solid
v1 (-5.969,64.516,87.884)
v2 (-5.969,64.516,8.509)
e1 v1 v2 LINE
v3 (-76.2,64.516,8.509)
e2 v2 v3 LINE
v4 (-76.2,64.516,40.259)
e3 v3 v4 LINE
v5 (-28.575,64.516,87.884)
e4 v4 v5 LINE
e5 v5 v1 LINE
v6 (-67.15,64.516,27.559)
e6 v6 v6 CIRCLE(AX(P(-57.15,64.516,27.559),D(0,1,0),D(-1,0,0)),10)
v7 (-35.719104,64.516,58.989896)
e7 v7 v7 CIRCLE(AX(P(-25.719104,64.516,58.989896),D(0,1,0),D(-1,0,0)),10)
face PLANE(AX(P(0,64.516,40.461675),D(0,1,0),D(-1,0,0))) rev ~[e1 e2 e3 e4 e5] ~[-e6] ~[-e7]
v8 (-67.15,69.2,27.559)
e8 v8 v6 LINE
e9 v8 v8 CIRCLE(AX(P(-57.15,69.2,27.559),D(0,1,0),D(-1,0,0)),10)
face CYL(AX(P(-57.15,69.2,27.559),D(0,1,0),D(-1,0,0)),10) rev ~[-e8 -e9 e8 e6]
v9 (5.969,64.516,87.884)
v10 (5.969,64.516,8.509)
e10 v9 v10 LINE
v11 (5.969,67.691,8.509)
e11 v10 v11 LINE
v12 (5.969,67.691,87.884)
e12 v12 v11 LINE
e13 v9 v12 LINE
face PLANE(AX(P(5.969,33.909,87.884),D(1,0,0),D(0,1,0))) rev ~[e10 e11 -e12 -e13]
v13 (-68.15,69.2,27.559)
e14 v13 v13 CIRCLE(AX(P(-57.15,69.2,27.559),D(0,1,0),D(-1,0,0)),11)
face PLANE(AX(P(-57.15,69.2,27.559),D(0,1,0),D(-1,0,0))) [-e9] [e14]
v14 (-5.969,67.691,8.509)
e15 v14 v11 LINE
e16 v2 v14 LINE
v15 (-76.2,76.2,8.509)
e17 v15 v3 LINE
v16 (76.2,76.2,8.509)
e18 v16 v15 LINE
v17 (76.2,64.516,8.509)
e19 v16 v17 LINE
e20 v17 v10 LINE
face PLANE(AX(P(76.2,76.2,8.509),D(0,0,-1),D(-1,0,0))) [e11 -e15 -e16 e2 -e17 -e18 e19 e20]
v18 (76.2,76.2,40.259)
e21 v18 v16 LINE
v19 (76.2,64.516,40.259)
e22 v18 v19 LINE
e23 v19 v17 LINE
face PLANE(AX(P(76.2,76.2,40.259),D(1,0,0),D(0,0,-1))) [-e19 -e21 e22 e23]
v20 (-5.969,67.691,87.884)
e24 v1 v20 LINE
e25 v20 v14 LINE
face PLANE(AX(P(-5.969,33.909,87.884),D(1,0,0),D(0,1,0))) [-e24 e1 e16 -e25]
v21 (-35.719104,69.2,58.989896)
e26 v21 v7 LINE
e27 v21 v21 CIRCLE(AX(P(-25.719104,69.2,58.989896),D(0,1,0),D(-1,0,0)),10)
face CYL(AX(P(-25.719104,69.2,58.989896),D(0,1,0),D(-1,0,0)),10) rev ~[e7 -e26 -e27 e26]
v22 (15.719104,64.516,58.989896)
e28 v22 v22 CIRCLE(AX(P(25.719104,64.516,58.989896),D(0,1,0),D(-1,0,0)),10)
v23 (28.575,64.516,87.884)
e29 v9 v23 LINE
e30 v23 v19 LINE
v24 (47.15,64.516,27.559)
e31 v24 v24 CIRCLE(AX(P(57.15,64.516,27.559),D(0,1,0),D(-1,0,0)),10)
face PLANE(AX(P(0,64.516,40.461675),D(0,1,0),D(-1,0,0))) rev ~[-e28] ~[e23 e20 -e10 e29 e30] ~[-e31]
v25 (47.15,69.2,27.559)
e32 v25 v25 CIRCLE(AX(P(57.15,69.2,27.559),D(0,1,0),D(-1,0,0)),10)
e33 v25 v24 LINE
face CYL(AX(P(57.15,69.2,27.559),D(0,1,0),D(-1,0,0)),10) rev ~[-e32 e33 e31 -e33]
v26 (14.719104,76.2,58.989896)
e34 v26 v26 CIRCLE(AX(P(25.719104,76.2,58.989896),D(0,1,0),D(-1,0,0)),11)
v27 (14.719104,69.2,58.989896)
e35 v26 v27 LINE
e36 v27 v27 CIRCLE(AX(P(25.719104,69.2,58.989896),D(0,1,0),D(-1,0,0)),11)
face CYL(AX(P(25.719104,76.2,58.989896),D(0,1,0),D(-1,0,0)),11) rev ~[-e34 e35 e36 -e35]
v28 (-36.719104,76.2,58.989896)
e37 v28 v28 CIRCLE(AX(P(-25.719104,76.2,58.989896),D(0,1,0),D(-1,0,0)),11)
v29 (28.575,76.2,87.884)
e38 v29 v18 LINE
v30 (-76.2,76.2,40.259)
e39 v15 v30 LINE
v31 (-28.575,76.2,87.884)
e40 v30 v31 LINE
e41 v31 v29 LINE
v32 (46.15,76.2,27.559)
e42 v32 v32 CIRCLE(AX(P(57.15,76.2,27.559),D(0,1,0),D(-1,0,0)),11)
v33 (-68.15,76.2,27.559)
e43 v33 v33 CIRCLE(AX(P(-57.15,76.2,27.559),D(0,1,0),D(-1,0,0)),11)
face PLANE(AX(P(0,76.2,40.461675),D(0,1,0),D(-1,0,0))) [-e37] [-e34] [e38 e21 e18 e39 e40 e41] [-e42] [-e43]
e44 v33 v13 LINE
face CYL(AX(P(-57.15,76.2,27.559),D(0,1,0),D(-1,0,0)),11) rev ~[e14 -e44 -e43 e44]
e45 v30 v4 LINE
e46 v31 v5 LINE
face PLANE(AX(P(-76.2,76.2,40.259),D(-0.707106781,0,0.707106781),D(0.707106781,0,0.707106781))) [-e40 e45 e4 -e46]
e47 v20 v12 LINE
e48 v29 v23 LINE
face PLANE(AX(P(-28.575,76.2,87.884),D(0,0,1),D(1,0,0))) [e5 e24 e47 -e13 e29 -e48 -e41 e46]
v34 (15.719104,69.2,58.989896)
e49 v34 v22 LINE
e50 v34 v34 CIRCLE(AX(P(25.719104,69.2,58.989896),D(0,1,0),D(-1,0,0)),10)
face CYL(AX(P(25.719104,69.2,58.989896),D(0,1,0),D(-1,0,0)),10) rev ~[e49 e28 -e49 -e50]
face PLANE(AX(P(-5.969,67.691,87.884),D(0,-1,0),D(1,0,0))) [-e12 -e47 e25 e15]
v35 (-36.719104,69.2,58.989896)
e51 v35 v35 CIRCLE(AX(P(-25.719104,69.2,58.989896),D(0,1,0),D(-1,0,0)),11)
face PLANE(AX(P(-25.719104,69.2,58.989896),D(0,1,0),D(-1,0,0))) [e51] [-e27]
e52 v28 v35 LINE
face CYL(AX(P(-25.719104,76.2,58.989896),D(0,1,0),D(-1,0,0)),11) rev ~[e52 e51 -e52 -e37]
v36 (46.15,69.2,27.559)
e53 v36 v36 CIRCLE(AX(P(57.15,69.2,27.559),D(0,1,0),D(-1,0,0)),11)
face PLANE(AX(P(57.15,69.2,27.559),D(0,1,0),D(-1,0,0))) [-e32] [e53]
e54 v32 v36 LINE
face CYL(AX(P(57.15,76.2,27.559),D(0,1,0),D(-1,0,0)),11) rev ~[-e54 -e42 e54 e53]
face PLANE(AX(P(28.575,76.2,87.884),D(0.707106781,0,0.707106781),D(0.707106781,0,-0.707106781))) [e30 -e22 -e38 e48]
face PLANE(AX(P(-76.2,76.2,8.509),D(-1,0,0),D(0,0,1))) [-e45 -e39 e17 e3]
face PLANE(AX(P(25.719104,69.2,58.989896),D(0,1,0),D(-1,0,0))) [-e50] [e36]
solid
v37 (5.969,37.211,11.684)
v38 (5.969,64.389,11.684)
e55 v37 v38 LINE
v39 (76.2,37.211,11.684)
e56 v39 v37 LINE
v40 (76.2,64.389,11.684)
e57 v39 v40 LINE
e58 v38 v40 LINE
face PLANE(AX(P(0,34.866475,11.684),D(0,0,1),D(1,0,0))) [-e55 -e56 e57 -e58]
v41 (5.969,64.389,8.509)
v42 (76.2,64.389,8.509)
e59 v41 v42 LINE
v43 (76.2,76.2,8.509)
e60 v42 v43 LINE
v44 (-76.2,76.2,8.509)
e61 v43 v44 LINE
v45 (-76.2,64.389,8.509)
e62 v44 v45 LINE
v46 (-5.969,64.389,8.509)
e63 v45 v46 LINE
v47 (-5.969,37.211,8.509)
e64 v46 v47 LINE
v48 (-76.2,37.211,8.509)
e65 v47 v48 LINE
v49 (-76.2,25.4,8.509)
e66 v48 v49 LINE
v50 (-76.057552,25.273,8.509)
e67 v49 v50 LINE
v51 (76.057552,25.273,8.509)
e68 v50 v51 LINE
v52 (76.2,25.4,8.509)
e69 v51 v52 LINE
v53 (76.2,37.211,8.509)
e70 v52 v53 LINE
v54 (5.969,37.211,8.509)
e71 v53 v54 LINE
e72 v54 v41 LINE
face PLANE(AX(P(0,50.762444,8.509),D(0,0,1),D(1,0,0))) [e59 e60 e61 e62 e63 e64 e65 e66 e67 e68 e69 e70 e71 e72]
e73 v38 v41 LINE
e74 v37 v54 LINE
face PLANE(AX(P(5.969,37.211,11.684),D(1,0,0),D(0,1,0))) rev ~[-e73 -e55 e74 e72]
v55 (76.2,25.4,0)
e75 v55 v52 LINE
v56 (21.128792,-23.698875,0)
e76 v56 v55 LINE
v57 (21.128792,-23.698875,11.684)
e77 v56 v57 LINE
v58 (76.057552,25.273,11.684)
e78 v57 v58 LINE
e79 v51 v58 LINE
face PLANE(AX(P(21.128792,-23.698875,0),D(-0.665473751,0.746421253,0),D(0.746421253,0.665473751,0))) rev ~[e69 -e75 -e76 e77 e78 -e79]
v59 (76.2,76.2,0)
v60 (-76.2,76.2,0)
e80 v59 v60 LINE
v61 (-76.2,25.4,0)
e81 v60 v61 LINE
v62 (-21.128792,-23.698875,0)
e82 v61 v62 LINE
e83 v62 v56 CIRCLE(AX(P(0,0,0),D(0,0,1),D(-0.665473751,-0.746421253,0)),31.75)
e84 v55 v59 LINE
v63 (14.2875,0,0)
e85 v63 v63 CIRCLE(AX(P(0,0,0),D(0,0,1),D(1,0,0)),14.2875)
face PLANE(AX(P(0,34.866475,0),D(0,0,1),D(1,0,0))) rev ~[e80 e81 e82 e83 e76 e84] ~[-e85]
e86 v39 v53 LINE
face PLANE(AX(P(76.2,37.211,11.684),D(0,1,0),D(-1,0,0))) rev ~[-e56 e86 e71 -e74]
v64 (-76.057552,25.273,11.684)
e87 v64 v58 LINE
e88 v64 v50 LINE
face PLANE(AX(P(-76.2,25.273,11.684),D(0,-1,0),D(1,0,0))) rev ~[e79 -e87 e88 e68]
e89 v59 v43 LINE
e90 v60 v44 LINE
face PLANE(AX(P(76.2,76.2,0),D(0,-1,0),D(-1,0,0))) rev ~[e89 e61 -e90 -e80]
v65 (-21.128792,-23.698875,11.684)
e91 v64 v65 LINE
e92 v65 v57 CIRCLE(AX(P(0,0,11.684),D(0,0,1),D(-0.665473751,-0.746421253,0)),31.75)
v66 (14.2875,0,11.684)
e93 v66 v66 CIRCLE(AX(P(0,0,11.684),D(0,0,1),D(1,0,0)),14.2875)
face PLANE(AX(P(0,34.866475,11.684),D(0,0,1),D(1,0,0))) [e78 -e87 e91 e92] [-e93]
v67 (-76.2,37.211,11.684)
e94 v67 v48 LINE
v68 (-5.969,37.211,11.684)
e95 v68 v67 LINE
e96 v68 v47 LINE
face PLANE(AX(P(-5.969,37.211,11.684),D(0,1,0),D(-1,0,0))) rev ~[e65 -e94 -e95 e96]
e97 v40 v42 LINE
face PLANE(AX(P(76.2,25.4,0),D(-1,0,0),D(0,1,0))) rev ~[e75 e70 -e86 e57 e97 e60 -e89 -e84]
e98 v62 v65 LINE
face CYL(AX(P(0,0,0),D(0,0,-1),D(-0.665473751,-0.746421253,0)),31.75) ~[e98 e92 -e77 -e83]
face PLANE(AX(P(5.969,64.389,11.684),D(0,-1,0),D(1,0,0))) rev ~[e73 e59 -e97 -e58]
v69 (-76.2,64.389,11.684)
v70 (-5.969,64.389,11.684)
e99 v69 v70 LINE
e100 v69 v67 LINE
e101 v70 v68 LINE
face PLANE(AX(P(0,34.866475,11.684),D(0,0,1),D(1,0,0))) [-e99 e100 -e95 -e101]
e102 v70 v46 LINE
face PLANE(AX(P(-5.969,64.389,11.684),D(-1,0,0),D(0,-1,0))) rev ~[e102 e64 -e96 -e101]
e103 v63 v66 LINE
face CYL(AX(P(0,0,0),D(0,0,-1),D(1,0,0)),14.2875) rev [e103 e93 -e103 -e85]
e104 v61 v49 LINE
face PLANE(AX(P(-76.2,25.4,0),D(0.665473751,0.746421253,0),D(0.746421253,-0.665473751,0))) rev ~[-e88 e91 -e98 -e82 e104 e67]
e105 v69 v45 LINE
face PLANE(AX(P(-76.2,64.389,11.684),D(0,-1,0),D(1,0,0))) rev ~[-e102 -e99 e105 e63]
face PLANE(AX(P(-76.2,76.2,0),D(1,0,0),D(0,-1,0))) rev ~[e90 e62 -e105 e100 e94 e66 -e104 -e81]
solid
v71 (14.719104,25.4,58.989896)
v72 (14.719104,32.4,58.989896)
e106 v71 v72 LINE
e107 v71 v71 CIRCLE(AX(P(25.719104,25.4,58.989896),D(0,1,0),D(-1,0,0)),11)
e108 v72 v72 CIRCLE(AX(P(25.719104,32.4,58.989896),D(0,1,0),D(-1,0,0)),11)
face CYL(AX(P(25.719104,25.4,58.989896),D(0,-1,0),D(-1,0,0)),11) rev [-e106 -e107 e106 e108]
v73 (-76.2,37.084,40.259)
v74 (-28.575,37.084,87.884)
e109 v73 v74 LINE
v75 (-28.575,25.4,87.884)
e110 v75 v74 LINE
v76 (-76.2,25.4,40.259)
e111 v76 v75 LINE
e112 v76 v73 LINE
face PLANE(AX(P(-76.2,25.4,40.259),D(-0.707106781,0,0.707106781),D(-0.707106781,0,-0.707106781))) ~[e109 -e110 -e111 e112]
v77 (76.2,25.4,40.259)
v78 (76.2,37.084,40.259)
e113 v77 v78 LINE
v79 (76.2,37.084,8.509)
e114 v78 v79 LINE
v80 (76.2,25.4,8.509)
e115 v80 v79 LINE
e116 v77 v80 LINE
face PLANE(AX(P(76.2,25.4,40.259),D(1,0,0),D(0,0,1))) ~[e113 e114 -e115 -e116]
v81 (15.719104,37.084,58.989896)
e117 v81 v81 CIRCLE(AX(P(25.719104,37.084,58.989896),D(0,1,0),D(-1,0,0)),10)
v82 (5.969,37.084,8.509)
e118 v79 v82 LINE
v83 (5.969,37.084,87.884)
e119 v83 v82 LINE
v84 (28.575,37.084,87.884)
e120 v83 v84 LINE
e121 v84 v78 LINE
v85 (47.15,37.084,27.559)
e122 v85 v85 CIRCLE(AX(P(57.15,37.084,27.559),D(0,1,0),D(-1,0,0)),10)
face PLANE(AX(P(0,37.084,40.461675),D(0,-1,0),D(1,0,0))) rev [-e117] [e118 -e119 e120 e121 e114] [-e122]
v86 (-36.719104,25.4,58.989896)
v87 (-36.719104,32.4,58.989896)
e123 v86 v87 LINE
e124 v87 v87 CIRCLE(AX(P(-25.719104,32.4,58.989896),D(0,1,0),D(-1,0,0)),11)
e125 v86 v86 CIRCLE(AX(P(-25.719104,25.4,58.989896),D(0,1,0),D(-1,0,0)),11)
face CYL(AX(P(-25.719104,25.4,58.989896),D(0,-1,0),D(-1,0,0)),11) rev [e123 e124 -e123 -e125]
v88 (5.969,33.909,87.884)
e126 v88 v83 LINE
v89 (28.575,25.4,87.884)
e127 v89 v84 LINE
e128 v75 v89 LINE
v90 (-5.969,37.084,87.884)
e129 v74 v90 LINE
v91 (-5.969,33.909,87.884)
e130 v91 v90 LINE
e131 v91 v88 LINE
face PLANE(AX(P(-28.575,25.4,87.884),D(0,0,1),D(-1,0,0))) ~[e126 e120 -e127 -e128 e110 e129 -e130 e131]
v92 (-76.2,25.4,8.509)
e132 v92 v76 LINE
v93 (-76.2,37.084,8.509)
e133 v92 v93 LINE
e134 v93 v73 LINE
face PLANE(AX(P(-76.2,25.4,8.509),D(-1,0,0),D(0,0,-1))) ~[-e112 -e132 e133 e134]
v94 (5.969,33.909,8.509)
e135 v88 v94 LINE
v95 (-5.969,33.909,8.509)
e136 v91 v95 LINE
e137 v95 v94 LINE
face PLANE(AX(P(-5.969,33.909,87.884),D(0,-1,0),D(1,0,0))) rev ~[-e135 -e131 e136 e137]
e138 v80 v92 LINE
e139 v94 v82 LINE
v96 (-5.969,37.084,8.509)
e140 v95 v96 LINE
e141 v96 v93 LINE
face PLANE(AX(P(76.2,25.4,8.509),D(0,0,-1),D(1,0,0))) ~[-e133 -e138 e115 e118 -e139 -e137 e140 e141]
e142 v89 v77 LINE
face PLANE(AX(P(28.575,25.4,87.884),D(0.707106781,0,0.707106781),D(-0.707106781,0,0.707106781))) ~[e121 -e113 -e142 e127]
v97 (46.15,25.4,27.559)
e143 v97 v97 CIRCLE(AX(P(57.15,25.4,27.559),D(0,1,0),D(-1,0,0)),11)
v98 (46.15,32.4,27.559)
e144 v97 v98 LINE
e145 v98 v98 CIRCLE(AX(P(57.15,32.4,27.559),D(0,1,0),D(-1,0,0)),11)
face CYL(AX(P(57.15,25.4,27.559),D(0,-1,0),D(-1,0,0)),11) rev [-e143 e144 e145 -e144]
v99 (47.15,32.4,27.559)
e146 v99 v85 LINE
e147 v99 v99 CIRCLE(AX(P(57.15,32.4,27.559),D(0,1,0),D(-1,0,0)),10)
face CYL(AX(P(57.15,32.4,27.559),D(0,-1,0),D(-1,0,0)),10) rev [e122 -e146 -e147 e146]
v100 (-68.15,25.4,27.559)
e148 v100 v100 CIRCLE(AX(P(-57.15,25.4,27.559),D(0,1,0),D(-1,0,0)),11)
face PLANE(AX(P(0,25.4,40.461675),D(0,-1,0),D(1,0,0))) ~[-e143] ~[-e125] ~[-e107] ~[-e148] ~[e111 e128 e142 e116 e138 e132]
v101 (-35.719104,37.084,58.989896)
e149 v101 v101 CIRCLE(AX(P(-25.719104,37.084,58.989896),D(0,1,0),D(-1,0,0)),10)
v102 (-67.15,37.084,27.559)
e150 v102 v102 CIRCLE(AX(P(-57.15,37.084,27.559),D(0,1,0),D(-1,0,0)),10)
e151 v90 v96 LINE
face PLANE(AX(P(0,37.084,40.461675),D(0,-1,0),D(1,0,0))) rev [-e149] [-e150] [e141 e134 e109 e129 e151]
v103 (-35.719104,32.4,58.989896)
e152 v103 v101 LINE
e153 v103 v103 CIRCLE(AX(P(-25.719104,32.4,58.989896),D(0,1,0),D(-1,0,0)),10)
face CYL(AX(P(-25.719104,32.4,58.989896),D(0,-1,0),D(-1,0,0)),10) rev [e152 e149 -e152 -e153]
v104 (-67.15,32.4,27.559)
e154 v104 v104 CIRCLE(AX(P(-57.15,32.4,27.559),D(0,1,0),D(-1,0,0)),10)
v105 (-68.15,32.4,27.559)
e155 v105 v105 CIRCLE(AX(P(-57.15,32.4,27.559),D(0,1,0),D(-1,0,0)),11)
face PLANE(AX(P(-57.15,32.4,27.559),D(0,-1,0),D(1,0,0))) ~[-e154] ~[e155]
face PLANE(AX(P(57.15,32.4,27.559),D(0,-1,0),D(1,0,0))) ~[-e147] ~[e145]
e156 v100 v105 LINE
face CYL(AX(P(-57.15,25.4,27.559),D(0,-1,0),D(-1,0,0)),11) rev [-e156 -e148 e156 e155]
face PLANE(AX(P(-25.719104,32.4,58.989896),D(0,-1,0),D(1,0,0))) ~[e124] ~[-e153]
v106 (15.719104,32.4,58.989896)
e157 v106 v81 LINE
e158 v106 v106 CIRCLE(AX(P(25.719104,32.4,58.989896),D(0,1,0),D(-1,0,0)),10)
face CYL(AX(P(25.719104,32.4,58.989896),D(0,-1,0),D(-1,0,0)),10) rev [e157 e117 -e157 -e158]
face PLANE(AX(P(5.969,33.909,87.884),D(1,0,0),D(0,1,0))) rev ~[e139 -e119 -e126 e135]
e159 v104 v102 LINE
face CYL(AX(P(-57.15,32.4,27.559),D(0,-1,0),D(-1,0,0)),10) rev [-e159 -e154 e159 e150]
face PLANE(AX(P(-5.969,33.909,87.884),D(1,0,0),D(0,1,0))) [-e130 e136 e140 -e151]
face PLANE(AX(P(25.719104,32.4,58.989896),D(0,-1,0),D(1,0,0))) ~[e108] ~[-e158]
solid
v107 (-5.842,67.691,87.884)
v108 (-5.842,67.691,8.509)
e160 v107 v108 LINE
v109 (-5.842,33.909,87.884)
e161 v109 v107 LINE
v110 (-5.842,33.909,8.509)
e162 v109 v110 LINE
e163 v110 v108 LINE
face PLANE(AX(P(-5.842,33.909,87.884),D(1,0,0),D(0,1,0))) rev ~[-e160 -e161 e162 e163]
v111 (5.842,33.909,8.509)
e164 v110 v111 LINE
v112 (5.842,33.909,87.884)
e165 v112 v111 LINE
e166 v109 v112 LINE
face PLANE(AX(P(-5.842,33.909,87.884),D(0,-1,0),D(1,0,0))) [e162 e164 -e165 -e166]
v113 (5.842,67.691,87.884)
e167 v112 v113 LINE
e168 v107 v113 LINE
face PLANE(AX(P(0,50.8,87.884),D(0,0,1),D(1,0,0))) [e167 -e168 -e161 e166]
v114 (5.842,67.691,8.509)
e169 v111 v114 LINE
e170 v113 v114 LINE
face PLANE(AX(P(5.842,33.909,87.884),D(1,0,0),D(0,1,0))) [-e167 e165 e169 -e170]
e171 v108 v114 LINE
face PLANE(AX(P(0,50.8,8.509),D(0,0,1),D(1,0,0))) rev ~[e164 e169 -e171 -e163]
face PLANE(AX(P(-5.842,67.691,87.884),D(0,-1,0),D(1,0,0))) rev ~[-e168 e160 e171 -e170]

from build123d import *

# Parameters (mm, degrees)
F0_R      = 14.2875
F1_DEPTH  = 11.684
F3_DEPTH  = 11.684
F4_R      = 11
F5_DEPTH  = 7
F6_R      = 10
F7_DEPTH  = 4.684
F13_W     = 11.684
F13_H     = 33.782
F14_DEPTH = 79.375
F16_DEPTH = 3.175
F17_W     = 11.938
F17_H     = 33.782
F18_DEPTH = 79.375


with BuildPart() as f1:
    # F0 (on Top) → F1 (new body)
    with BuildSketch(Plane.XY):
        with BuildLine():
            Line((-76.2, 25.4), (-21.1287915932, -23.6988747795))
            ThreePointArc((-21.1287915932, -23.6988747795), (0, -31.75), (21.1287915932, -23.6988747795))
            Line((21.1287915932, -23.6988747795), (76.2, 25.4))
            Line((76.2, 25.4), (76.2, 76.2))
            Line((76.2, 76.2), (-76.2, 76.2))
            Line((-76.2, 76.2), (-76.2, 25.4))
        make_face()
        Circle(F0_R, mode=Mode.SUBTRACT)
    extrude(amount=F1_DEPTH)

    # F15 (on face) → F16 (cut, through all)
    with BuildSketch(Plane.XY.offset(11.684)):
        Polygon((76.2, 76.2), (-76.2, 76.2), (-76.2, 64.389), (-5.969, 64.389), (-5.969, 37.211), (-76.2, 37.211), (-76.2, 25.273), (76.2, 25.273), (76.2, 37.211), (5.969, 37.211), (5.969, 64.389), (76.2, 64.389), align=None)
    extrude(amount=-F16_DEPTH, mode=Mode.SUBTRACT)


with BuildPart() as f3:
    # F2 (on face) → F3 (new body)
    with BuildSketch(Plane(origin=(0, 76.2, 0), x_dir=(-1, 0, 0), z_dir=(0, 1, 0))):
        Polygon((-76.2, 40.259), (-76.2, 8.509), (76.2, 8.509), (76.2, 40.259), (28.575, 87.884), (-28.575, 87.884), align=None)
    extrude(amount=-F3_DEPTH)

    # F4 (on face) → F5 (cut)
    with BuildSketch(Plane(origin=(0, 76.2, 0), x_dir=(-1, 0, 0), z_dir=(0, 1, 0))):
        with Locations((-57.15, 27.559)):
            Circle(F4_R)
        with Locations((-25.7191035763, 58.9898964237)):
            Circle(F4_R)
        with Locations((25.7191035763, 58.9898964237)):
            Circle(F4_R)
        with Locations((57.15, 27.559)):
            Circle(F4_R)
    extrude(amount=-F5_DEPTH, mode=Mode.SUBTRACT)

    # F6 (on face) → F7 (cut, through all)
    with BuildSketch(Plane(origin=(0, 69.2, 0), x_dir=(-1, 0, 0), z_dir=(0, 1, 0))):
        with Locations((-25.7191035763, 58.9898964237)):
            Circle(F6_R)
        with Locations((-57.15, 27.559)):
            Circle(F6_R)
        with Locations((25.7191035763, 58.9898964237)):
            Circle(F6_R)
        with Locations((57.15, 27.559)):
            Circle(F6_R)
    extrude(amount=-F7_DEPTH, mode=Mode.SUBTRACT)


with BuildPart() as f12_1:
    # F12: instance of F3
    add(f3.part.mirror(Plane(origin=(-76.2, 50.8, 11.684), x_dir=(0, 0, -1), z_dir=(0, 1, 0))))


with BuildPart() as f14:
    # F13 (on face) → F14 (new body, through all)
    with BuildSketch(Plane.XY.offset(87.884)):
        with Locations((0, 50.8)):
            Rectangle(F13_W, F13_H)
    extrude(amount=-F14_DEPTH)


with BuildPart() as f18_tool:
    # F17 (on face) → F18 (new body, through all)
    with BuildSketch(Plane.XY.offset(87.884)):
        with Locations((0, 50.8)):
            Rectangle(F17_W, F17_H)
    extrude(amount=-F18_DEPTH)


with BuildPart() as f3_1:
    add(f3.part)

    # F18: cut by f18_tool
    add(f18_tool.part, mode=Mode.SUBTRACT)


with BuildPart() as f12_1_1:
    add(f12_1.part)

    # F18: cut by f18_tool
    add(f18_tool.part, mode=Mode.SUBTRACT)


solid = Compound([f1.part, f14.part, f3_1.part, f12_1_1.part])
